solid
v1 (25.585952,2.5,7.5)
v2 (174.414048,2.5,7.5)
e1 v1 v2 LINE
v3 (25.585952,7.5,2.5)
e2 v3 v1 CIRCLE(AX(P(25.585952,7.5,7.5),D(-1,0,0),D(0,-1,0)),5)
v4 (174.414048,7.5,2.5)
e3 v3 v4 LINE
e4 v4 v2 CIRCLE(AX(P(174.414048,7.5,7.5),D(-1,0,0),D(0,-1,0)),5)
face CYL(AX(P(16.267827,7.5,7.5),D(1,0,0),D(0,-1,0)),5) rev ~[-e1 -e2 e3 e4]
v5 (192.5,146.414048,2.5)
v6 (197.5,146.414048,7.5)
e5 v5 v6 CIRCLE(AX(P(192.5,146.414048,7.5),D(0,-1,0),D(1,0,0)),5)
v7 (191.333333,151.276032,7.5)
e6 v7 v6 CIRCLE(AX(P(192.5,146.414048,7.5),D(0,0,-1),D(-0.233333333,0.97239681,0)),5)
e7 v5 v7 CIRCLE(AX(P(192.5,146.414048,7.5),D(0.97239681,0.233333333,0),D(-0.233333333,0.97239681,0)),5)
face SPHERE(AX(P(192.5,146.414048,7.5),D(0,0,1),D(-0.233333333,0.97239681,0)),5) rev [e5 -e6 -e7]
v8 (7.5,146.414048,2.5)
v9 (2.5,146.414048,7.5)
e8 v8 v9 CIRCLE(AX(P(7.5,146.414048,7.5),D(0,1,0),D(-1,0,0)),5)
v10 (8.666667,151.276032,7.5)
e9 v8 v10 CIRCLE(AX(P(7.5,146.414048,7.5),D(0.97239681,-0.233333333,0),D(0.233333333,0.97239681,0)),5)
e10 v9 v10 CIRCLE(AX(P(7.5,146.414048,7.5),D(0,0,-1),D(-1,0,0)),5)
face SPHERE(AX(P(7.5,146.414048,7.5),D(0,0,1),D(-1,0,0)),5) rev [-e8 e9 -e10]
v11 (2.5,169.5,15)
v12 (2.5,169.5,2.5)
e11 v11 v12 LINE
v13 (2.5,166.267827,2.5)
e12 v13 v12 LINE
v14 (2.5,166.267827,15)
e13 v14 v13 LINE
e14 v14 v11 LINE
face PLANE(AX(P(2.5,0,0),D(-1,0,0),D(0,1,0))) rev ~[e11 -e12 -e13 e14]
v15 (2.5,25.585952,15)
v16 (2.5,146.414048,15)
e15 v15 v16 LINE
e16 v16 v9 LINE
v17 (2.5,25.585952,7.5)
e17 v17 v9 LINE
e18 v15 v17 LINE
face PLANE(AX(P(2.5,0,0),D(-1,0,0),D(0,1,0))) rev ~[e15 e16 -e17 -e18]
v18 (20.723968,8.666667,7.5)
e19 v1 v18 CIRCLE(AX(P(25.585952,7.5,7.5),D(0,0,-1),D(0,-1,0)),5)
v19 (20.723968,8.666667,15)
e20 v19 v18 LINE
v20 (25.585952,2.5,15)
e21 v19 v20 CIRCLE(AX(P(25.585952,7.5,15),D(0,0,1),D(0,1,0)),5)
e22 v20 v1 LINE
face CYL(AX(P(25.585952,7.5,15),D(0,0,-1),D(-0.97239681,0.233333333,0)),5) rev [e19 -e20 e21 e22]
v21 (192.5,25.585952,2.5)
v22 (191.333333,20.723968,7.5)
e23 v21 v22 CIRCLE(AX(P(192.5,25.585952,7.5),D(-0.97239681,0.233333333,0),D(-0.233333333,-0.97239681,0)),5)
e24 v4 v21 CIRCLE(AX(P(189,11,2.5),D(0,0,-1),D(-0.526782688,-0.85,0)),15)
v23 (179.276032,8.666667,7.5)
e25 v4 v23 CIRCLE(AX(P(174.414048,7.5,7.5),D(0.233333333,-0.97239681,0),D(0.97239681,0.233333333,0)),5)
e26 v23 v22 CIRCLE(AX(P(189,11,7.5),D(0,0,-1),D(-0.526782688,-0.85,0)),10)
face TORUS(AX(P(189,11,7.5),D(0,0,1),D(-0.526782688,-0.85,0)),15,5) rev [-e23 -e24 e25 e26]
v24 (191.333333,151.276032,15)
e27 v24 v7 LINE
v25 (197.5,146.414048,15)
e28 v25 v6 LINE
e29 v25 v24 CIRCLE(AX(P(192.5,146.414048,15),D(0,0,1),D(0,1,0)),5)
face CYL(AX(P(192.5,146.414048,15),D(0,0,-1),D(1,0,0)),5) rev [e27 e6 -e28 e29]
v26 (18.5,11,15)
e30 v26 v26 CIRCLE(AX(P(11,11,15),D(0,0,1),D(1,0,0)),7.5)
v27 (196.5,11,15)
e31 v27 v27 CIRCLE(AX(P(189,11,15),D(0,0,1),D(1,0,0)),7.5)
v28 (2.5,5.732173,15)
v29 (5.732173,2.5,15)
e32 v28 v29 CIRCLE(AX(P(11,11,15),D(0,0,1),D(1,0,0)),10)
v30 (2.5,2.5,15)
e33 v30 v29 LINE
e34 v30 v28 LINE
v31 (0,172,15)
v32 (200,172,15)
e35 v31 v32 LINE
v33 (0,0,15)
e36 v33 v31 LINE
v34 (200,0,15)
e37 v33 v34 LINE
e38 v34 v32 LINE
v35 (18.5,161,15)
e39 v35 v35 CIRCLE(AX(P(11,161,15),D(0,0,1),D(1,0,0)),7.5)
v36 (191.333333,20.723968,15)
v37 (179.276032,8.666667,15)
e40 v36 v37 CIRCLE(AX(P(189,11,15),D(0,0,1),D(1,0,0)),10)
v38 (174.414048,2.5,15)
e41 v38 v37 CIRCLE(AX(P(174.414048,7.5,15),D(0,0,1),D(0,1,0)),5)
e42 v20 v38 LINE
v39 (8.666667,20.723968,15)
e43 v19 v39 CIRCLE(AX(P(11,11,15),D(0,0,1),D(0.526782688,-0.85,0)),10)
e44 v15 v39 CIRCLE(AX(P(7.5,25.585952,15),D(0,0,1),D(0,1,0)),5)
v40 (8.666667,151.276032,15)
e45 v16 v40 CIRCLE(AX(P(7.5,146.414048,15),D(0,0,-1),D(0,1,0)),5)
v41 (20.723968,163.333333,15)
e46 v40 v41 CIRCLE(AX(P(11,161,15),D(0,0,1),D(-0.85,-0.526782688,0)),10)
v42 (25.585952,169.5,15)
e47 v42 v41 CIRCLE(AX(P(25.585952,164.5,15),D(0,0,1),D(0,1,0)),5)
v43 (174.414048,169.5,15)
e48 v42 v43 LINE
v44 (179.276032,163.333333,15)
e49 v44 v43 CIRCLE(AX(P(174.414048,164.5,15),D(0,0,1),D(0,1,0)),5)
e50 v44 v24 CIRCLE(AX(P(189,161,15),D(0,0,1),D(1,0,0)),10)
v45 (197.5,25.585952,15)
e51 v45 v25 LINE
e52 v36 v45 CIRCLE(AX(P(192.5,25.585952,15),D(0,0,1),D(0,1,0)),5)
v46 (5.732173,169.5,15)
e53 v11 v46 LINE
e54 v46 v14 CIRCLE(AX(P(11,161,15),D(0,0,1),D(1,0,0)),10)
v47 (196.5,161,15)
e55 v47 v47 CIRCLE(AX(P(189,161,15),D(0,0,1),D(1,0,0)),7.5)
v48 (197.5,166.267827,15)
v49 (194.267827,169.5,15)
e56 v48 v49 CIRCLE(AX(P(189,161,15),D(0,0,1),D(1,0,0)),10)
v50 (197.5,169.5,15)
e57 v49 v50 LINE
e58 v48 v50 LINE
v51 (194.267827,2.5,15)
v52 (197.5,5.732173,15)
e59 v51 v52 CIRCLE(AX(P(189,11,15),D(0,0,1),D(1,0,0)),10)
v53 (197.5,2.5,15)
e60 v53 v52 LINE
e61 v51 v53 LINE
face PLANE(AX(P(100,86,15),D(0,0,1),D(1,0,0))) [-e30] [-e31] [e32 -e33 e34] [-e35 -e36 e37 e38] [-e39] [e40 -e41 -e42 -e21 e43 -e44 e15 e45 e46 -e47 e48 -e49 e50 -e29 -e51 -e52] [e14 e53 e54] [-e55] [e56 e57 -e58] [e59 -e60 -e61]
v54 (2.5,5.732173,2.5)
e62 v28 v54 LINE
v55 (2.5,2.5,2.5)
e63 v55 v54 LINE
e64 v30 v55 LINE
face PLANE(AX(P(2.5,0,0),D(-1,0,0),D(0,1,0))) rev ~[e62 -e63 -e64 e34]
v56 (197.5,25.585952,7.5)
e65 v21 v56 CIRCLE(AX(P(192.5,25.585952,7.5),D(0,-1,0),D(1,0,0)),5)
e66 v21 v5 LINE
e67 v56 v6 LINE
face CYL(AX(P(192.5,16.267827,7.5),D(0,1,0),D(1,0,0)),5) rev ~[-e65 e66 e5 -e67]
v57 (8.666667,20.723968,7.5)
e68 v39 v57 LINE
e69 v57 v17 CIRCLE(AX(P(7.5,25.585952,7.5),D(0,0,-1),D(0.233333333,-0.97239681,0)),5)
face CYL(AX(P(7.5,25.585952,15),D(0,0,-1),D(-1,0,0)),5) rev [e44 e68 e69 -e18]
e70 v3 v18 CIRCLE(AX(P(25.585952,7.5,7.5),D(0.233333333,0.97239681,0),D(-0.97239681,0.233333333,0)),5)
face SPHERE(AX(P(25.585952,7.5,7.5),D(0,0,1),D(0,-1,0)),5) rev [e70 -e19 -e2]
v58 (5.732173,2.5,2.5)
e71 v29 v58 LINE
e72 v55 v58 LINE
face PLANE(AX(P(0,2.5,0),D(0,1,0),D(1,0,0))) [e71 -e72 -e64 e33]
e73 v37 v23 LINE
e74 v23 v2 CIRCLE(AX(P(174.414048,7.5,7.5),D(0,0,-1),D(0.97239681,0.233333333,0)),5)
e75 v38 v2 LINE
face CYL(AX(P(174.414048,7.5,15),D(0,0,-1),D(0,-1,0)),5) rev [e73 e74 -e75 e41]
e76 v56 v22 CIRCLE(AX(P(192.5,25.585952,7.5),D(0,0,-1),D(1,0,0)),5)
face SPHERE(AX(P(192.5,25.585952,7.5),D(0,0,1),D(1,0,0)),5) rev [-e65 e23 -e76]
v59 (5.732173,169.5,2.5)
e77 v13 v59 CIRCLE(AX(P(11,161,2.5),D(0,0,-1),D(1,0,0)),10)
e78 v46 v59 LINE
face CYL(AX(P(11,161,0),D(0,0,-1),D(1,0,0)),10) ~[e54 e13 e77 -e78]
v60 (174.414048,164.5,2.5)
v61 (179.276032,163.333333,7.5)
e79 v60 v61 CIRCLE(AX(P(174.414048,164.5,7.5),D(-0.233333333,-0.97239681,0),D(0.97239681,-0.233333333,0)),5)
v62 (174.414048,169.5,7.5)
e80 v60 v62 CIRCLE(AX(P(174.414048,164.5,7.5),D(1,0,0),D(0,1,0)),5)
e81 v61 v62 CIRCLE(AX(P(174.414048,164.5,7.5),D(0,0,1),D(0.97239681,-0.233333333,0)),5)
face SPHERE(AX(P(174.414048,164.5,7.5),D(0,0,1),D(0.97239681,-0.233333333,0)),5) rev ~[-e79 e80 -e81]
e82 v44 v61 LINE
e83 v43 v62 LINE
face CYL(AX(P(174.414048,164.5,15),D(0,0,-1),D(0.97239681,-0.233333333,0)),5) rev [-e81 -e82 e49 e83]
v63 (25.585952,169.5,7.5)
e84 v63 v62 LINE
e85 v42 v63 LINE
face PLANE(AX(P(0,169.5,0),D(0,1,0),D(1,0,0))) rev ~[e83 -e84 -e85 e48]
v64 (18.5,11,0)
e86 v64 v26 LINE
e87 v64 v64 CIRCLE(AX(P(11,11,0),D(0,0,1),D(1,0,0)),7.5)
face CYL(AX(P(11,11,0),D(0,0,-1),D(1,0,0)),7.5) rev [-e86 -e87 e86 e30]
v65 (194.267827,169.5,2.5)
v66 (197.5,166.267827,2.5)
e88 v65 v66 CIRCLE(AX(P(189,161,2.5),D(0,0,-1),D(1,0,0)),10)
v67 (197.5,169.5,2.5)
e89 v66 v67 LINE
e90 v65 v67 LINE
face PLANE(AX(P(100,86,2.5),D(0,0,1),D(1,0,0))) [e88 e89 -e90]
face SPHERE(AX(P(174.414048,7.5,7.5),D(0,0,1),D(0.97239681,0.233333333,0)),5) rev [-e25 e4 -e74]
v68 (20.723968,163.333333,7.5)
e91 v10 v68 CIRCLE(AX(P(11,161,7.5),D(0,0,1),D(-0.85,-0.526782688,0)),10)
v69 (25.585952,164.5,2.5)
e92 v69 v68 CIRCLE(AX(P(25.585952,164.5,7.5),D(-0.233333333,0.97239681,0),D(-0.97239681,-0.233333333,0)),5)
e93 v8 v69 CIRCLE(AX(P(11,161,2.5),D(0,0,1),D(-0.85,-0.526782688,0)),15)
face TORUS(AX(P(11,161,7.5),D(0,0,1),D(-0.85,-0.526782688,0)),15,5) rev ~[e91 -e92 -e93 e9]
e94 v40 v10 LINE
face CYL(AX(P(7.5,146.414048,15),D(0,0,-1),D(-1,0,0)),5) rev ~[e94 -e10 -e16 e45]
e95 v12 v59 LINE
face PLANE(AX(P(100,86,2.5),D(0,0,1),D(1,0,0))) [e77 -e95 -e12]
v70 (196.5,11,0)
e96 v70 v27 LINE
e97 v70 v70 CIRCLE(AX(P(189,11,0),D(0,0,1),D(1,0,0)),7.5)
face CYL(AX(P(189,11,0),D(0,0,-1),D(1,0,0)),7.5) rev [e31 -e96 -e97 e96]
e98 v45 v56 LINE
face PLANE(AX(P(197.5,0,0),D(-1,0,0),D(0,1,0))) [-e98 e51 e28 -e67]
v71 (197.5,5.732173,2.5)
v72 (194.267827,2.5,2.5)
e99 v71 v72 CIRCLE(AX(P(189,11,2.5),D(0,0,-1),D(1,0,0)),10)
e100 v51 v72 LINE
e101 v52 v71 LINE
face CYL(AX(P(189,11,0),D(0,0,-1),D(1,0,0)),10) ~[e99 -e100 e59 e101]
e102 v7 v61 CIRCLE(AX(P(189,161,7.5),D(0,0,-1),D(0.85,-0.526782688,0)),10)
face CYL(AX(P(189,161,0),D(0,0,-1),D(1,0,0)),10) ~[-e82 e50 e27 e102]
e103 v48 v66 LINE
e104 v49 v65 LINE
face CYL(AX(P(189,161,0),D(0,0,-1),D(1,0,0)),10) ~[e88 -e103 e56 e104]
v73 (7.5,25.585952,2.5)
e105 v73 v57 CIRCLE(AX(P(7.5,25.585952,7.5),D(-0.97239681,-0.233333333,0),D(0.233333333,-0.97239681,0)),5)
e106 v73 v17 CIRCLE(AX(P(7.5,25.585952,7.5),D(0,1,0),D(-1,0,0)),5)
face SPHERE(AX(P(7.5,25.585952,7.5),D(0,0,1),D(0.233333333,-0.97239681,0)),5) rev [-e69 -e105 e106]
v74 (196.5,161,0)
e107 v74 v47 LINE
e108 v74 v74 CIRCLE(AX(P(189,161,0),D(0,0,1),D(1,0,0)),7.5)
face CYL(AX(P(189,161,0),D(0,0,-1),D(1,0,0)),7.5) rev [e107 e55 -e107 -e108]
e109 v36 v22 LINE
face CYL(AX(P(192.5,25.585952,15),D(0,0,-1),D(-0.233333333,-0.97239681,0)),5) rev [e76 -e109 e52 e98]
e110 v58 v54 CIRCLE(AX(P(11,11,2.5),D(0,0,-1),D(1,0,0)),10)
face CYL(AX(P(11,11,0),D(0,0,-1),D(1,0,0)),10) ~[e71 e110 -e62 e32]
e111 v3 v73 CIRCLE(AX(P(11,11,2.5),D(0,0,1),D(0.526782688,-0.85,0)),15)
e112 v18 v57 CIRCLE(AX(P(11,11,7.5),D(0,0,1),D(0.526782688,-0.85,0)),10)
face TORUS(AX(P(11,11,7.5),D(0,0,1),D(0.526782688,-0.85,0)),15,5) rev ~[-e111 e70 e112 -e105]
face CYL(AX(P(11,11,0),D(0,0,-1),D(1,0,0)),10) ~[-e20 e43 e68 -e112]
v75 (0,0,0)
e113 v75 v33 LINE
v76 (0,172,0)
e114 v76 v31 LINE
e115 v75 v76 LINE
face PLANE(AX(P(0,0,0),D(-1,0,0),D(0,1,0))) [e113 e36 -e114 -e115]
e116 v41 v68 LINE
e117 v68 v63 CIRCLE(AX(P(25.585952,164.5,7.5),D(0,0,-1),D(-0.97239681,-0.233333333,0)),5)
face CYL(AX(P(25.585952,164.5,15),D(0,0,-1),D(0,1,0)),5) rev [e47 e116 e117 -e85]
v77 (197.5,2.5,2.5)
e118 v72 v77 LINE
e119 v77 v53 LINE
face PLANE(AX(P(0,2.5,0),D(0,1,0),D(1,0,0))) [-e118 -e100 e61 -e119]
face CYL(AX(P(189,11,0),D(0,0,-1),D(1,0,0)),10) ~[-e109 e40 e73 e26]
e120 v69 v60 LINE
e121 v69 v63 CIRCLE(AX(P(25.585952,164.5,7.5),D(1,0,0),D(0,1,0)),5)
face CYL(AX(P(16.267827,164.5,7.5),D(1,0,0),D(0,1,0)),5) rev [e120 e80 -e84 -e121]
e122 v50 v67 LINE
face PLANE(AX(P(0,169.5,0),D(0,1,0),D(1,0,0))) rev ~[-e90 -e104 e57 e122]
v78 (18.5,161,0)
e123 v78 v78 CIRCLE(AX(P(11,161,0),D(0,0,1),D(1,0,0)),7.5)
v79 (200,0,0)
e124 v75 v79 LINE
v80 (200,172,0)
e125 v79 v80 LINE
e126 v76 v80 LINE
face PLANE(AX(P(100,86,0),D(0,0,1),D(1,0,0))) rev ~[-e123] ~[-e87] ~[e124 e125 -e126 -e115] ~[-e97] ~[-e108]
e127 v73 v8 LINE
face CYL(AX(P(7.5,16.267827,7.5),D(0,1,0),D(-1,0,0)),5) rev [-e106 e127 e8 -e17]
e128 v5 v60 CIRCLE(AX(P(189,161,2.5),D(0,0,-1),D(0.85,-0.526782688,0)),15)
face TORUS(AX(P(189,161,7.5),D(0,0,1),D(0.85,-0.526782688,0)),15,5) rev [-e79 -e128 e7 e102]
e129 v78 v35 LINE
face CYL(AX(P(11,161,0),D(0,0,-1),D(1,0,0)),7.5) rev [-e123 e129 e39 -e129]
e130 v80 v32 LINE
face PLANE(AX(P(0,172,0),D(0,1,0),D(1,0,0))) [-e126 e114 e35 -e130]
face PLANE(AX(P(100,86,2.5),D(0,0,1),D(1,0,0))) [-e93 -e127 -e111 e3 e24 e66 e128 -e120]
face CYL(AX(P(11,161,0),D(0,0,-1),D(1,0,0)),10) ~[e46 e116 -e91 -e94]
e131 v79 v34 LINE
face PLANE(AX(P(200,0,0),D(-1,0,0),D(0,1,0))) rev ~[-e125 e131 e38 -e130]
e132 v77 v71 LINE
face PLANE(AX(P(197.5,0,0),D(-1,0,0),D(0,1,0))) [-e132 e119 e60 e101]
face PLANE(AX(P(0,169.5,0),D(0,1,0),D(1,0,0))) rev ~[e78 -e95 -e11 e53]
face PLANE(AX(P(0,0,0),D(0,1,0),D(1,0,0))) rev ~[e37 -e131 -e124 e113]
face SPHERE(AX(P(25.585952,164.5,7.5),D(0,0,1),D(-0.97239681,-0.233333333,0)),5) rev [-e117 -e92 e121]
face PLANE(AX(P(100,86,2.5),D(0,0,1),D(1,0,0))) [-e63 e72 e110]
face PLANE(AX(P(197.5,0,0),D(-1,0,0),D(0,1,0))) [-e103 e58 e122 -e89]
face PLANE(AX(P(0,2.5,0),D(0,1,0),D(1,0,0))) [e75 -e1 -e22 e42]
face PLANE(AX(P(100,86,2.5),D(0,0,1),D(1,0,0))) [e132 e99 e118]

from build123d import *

# Parameters (mm, degrees)
F0_W     = 200
F0_H     = 172
F0_R     = 7.5
F1_DEPTH = 15
F2_T     = 2.5
F3_R     = 5


# Not quite as in the source:
# - a shell that OpenCascade refuses in one call is made with other operations: the cavity is built on its own and cut out


with BuildPart() as f1:
    # F0 (on Top) → F1 (new body)
    with BuildSketch(Plane.XY):
        with Locations((100, 86)):
            Rectangle(F0_W, F0_H)
        with Locations((11, 11)):
            Circle(F0_R, mode=Mode.SUBTRACT)
        with Locations((189, 11)):
            Circle(F0_R, mode=Mode.SUBTRACT)
        with Locations((11, 161)):
            Circle(F0_R, mode=Mode.SUBTRACT)
        with Locations((189, 161)):
            Circle(F0_R, mode=Mode.SUBTRACT)
    extrude(amount=F1_DEPTH)

    # F2: shell of thickness 2.5, made by hand


with BuildPart() as f2_core1:
    # F2_t2: copy of F1
    add(f1.part)

    # the walls: a layer under each face that stays
    f2_faces = [f2_core1.faces().sort_by_distance(p)[0] for p in [
        (0, 86, 7.5),
        (100, 0, 7.5),
        (200, 86, 7.5),
        (100, 172, 7.5),
        (3.5, 11, 7.5),
        (181.5, 11, 7.5),
        (3.5, 161, 7.5),
        (181.5, 161, 7.5),
        (100, 86, 0),
    ]]
    thicken(f2_faces, amount=-F2_T, mode=Mode.SUBTRACT)


with BuildPart() as f1_1:
    add(f1.part)

    # what is left inside the walls is the cavity
    f2_cavity = [f2_core1.part.solids().sort_by_distance(p)[0] for p in [
        (3.911255, 168.088745, 10.833333),
        (100, 58.166667, 14.975),
        (3.911255, 3.911255, 10.833333),
        (196.088745, 168.088745, 10.833333),
        (196.088745, 3.911255, 10.833333),
    ]]
    add(f2_cavity, mode=Mode.SUBTRACT)

    # F3
    f3_edges = [f1_1.edges().sort_by_distance(p)[0] for p in [
        (100, 169.5, 2.5),
        (16.267827, 169.5, 8.75),
        (183.732173, 169.5, 8.75),
        (18.071068, 153.928932, 2.5),
        (2.5, 155.732173, 8.75),
        (2.5, 86, 2.5),
        (2.5, 16.267827, 8.75),
        (18.071068, 18.071068, 2.5),
        (16.267827, 2.5, 8.75),
        (100, 2.5, 2.5),
        (183.732173, 2.5, 8.75),
        (181.928932, 18.071068, 2.5),
        (197.5, 16.267827, 8.75),
        (197.5, 86, 2.5),
        (197.5, 155.732173, 8.75),
        (181.928932, 153.928932, 2.5),
    ]]
    fillet(f3_edges, radius=F3_R)


solid = f1_1.part
